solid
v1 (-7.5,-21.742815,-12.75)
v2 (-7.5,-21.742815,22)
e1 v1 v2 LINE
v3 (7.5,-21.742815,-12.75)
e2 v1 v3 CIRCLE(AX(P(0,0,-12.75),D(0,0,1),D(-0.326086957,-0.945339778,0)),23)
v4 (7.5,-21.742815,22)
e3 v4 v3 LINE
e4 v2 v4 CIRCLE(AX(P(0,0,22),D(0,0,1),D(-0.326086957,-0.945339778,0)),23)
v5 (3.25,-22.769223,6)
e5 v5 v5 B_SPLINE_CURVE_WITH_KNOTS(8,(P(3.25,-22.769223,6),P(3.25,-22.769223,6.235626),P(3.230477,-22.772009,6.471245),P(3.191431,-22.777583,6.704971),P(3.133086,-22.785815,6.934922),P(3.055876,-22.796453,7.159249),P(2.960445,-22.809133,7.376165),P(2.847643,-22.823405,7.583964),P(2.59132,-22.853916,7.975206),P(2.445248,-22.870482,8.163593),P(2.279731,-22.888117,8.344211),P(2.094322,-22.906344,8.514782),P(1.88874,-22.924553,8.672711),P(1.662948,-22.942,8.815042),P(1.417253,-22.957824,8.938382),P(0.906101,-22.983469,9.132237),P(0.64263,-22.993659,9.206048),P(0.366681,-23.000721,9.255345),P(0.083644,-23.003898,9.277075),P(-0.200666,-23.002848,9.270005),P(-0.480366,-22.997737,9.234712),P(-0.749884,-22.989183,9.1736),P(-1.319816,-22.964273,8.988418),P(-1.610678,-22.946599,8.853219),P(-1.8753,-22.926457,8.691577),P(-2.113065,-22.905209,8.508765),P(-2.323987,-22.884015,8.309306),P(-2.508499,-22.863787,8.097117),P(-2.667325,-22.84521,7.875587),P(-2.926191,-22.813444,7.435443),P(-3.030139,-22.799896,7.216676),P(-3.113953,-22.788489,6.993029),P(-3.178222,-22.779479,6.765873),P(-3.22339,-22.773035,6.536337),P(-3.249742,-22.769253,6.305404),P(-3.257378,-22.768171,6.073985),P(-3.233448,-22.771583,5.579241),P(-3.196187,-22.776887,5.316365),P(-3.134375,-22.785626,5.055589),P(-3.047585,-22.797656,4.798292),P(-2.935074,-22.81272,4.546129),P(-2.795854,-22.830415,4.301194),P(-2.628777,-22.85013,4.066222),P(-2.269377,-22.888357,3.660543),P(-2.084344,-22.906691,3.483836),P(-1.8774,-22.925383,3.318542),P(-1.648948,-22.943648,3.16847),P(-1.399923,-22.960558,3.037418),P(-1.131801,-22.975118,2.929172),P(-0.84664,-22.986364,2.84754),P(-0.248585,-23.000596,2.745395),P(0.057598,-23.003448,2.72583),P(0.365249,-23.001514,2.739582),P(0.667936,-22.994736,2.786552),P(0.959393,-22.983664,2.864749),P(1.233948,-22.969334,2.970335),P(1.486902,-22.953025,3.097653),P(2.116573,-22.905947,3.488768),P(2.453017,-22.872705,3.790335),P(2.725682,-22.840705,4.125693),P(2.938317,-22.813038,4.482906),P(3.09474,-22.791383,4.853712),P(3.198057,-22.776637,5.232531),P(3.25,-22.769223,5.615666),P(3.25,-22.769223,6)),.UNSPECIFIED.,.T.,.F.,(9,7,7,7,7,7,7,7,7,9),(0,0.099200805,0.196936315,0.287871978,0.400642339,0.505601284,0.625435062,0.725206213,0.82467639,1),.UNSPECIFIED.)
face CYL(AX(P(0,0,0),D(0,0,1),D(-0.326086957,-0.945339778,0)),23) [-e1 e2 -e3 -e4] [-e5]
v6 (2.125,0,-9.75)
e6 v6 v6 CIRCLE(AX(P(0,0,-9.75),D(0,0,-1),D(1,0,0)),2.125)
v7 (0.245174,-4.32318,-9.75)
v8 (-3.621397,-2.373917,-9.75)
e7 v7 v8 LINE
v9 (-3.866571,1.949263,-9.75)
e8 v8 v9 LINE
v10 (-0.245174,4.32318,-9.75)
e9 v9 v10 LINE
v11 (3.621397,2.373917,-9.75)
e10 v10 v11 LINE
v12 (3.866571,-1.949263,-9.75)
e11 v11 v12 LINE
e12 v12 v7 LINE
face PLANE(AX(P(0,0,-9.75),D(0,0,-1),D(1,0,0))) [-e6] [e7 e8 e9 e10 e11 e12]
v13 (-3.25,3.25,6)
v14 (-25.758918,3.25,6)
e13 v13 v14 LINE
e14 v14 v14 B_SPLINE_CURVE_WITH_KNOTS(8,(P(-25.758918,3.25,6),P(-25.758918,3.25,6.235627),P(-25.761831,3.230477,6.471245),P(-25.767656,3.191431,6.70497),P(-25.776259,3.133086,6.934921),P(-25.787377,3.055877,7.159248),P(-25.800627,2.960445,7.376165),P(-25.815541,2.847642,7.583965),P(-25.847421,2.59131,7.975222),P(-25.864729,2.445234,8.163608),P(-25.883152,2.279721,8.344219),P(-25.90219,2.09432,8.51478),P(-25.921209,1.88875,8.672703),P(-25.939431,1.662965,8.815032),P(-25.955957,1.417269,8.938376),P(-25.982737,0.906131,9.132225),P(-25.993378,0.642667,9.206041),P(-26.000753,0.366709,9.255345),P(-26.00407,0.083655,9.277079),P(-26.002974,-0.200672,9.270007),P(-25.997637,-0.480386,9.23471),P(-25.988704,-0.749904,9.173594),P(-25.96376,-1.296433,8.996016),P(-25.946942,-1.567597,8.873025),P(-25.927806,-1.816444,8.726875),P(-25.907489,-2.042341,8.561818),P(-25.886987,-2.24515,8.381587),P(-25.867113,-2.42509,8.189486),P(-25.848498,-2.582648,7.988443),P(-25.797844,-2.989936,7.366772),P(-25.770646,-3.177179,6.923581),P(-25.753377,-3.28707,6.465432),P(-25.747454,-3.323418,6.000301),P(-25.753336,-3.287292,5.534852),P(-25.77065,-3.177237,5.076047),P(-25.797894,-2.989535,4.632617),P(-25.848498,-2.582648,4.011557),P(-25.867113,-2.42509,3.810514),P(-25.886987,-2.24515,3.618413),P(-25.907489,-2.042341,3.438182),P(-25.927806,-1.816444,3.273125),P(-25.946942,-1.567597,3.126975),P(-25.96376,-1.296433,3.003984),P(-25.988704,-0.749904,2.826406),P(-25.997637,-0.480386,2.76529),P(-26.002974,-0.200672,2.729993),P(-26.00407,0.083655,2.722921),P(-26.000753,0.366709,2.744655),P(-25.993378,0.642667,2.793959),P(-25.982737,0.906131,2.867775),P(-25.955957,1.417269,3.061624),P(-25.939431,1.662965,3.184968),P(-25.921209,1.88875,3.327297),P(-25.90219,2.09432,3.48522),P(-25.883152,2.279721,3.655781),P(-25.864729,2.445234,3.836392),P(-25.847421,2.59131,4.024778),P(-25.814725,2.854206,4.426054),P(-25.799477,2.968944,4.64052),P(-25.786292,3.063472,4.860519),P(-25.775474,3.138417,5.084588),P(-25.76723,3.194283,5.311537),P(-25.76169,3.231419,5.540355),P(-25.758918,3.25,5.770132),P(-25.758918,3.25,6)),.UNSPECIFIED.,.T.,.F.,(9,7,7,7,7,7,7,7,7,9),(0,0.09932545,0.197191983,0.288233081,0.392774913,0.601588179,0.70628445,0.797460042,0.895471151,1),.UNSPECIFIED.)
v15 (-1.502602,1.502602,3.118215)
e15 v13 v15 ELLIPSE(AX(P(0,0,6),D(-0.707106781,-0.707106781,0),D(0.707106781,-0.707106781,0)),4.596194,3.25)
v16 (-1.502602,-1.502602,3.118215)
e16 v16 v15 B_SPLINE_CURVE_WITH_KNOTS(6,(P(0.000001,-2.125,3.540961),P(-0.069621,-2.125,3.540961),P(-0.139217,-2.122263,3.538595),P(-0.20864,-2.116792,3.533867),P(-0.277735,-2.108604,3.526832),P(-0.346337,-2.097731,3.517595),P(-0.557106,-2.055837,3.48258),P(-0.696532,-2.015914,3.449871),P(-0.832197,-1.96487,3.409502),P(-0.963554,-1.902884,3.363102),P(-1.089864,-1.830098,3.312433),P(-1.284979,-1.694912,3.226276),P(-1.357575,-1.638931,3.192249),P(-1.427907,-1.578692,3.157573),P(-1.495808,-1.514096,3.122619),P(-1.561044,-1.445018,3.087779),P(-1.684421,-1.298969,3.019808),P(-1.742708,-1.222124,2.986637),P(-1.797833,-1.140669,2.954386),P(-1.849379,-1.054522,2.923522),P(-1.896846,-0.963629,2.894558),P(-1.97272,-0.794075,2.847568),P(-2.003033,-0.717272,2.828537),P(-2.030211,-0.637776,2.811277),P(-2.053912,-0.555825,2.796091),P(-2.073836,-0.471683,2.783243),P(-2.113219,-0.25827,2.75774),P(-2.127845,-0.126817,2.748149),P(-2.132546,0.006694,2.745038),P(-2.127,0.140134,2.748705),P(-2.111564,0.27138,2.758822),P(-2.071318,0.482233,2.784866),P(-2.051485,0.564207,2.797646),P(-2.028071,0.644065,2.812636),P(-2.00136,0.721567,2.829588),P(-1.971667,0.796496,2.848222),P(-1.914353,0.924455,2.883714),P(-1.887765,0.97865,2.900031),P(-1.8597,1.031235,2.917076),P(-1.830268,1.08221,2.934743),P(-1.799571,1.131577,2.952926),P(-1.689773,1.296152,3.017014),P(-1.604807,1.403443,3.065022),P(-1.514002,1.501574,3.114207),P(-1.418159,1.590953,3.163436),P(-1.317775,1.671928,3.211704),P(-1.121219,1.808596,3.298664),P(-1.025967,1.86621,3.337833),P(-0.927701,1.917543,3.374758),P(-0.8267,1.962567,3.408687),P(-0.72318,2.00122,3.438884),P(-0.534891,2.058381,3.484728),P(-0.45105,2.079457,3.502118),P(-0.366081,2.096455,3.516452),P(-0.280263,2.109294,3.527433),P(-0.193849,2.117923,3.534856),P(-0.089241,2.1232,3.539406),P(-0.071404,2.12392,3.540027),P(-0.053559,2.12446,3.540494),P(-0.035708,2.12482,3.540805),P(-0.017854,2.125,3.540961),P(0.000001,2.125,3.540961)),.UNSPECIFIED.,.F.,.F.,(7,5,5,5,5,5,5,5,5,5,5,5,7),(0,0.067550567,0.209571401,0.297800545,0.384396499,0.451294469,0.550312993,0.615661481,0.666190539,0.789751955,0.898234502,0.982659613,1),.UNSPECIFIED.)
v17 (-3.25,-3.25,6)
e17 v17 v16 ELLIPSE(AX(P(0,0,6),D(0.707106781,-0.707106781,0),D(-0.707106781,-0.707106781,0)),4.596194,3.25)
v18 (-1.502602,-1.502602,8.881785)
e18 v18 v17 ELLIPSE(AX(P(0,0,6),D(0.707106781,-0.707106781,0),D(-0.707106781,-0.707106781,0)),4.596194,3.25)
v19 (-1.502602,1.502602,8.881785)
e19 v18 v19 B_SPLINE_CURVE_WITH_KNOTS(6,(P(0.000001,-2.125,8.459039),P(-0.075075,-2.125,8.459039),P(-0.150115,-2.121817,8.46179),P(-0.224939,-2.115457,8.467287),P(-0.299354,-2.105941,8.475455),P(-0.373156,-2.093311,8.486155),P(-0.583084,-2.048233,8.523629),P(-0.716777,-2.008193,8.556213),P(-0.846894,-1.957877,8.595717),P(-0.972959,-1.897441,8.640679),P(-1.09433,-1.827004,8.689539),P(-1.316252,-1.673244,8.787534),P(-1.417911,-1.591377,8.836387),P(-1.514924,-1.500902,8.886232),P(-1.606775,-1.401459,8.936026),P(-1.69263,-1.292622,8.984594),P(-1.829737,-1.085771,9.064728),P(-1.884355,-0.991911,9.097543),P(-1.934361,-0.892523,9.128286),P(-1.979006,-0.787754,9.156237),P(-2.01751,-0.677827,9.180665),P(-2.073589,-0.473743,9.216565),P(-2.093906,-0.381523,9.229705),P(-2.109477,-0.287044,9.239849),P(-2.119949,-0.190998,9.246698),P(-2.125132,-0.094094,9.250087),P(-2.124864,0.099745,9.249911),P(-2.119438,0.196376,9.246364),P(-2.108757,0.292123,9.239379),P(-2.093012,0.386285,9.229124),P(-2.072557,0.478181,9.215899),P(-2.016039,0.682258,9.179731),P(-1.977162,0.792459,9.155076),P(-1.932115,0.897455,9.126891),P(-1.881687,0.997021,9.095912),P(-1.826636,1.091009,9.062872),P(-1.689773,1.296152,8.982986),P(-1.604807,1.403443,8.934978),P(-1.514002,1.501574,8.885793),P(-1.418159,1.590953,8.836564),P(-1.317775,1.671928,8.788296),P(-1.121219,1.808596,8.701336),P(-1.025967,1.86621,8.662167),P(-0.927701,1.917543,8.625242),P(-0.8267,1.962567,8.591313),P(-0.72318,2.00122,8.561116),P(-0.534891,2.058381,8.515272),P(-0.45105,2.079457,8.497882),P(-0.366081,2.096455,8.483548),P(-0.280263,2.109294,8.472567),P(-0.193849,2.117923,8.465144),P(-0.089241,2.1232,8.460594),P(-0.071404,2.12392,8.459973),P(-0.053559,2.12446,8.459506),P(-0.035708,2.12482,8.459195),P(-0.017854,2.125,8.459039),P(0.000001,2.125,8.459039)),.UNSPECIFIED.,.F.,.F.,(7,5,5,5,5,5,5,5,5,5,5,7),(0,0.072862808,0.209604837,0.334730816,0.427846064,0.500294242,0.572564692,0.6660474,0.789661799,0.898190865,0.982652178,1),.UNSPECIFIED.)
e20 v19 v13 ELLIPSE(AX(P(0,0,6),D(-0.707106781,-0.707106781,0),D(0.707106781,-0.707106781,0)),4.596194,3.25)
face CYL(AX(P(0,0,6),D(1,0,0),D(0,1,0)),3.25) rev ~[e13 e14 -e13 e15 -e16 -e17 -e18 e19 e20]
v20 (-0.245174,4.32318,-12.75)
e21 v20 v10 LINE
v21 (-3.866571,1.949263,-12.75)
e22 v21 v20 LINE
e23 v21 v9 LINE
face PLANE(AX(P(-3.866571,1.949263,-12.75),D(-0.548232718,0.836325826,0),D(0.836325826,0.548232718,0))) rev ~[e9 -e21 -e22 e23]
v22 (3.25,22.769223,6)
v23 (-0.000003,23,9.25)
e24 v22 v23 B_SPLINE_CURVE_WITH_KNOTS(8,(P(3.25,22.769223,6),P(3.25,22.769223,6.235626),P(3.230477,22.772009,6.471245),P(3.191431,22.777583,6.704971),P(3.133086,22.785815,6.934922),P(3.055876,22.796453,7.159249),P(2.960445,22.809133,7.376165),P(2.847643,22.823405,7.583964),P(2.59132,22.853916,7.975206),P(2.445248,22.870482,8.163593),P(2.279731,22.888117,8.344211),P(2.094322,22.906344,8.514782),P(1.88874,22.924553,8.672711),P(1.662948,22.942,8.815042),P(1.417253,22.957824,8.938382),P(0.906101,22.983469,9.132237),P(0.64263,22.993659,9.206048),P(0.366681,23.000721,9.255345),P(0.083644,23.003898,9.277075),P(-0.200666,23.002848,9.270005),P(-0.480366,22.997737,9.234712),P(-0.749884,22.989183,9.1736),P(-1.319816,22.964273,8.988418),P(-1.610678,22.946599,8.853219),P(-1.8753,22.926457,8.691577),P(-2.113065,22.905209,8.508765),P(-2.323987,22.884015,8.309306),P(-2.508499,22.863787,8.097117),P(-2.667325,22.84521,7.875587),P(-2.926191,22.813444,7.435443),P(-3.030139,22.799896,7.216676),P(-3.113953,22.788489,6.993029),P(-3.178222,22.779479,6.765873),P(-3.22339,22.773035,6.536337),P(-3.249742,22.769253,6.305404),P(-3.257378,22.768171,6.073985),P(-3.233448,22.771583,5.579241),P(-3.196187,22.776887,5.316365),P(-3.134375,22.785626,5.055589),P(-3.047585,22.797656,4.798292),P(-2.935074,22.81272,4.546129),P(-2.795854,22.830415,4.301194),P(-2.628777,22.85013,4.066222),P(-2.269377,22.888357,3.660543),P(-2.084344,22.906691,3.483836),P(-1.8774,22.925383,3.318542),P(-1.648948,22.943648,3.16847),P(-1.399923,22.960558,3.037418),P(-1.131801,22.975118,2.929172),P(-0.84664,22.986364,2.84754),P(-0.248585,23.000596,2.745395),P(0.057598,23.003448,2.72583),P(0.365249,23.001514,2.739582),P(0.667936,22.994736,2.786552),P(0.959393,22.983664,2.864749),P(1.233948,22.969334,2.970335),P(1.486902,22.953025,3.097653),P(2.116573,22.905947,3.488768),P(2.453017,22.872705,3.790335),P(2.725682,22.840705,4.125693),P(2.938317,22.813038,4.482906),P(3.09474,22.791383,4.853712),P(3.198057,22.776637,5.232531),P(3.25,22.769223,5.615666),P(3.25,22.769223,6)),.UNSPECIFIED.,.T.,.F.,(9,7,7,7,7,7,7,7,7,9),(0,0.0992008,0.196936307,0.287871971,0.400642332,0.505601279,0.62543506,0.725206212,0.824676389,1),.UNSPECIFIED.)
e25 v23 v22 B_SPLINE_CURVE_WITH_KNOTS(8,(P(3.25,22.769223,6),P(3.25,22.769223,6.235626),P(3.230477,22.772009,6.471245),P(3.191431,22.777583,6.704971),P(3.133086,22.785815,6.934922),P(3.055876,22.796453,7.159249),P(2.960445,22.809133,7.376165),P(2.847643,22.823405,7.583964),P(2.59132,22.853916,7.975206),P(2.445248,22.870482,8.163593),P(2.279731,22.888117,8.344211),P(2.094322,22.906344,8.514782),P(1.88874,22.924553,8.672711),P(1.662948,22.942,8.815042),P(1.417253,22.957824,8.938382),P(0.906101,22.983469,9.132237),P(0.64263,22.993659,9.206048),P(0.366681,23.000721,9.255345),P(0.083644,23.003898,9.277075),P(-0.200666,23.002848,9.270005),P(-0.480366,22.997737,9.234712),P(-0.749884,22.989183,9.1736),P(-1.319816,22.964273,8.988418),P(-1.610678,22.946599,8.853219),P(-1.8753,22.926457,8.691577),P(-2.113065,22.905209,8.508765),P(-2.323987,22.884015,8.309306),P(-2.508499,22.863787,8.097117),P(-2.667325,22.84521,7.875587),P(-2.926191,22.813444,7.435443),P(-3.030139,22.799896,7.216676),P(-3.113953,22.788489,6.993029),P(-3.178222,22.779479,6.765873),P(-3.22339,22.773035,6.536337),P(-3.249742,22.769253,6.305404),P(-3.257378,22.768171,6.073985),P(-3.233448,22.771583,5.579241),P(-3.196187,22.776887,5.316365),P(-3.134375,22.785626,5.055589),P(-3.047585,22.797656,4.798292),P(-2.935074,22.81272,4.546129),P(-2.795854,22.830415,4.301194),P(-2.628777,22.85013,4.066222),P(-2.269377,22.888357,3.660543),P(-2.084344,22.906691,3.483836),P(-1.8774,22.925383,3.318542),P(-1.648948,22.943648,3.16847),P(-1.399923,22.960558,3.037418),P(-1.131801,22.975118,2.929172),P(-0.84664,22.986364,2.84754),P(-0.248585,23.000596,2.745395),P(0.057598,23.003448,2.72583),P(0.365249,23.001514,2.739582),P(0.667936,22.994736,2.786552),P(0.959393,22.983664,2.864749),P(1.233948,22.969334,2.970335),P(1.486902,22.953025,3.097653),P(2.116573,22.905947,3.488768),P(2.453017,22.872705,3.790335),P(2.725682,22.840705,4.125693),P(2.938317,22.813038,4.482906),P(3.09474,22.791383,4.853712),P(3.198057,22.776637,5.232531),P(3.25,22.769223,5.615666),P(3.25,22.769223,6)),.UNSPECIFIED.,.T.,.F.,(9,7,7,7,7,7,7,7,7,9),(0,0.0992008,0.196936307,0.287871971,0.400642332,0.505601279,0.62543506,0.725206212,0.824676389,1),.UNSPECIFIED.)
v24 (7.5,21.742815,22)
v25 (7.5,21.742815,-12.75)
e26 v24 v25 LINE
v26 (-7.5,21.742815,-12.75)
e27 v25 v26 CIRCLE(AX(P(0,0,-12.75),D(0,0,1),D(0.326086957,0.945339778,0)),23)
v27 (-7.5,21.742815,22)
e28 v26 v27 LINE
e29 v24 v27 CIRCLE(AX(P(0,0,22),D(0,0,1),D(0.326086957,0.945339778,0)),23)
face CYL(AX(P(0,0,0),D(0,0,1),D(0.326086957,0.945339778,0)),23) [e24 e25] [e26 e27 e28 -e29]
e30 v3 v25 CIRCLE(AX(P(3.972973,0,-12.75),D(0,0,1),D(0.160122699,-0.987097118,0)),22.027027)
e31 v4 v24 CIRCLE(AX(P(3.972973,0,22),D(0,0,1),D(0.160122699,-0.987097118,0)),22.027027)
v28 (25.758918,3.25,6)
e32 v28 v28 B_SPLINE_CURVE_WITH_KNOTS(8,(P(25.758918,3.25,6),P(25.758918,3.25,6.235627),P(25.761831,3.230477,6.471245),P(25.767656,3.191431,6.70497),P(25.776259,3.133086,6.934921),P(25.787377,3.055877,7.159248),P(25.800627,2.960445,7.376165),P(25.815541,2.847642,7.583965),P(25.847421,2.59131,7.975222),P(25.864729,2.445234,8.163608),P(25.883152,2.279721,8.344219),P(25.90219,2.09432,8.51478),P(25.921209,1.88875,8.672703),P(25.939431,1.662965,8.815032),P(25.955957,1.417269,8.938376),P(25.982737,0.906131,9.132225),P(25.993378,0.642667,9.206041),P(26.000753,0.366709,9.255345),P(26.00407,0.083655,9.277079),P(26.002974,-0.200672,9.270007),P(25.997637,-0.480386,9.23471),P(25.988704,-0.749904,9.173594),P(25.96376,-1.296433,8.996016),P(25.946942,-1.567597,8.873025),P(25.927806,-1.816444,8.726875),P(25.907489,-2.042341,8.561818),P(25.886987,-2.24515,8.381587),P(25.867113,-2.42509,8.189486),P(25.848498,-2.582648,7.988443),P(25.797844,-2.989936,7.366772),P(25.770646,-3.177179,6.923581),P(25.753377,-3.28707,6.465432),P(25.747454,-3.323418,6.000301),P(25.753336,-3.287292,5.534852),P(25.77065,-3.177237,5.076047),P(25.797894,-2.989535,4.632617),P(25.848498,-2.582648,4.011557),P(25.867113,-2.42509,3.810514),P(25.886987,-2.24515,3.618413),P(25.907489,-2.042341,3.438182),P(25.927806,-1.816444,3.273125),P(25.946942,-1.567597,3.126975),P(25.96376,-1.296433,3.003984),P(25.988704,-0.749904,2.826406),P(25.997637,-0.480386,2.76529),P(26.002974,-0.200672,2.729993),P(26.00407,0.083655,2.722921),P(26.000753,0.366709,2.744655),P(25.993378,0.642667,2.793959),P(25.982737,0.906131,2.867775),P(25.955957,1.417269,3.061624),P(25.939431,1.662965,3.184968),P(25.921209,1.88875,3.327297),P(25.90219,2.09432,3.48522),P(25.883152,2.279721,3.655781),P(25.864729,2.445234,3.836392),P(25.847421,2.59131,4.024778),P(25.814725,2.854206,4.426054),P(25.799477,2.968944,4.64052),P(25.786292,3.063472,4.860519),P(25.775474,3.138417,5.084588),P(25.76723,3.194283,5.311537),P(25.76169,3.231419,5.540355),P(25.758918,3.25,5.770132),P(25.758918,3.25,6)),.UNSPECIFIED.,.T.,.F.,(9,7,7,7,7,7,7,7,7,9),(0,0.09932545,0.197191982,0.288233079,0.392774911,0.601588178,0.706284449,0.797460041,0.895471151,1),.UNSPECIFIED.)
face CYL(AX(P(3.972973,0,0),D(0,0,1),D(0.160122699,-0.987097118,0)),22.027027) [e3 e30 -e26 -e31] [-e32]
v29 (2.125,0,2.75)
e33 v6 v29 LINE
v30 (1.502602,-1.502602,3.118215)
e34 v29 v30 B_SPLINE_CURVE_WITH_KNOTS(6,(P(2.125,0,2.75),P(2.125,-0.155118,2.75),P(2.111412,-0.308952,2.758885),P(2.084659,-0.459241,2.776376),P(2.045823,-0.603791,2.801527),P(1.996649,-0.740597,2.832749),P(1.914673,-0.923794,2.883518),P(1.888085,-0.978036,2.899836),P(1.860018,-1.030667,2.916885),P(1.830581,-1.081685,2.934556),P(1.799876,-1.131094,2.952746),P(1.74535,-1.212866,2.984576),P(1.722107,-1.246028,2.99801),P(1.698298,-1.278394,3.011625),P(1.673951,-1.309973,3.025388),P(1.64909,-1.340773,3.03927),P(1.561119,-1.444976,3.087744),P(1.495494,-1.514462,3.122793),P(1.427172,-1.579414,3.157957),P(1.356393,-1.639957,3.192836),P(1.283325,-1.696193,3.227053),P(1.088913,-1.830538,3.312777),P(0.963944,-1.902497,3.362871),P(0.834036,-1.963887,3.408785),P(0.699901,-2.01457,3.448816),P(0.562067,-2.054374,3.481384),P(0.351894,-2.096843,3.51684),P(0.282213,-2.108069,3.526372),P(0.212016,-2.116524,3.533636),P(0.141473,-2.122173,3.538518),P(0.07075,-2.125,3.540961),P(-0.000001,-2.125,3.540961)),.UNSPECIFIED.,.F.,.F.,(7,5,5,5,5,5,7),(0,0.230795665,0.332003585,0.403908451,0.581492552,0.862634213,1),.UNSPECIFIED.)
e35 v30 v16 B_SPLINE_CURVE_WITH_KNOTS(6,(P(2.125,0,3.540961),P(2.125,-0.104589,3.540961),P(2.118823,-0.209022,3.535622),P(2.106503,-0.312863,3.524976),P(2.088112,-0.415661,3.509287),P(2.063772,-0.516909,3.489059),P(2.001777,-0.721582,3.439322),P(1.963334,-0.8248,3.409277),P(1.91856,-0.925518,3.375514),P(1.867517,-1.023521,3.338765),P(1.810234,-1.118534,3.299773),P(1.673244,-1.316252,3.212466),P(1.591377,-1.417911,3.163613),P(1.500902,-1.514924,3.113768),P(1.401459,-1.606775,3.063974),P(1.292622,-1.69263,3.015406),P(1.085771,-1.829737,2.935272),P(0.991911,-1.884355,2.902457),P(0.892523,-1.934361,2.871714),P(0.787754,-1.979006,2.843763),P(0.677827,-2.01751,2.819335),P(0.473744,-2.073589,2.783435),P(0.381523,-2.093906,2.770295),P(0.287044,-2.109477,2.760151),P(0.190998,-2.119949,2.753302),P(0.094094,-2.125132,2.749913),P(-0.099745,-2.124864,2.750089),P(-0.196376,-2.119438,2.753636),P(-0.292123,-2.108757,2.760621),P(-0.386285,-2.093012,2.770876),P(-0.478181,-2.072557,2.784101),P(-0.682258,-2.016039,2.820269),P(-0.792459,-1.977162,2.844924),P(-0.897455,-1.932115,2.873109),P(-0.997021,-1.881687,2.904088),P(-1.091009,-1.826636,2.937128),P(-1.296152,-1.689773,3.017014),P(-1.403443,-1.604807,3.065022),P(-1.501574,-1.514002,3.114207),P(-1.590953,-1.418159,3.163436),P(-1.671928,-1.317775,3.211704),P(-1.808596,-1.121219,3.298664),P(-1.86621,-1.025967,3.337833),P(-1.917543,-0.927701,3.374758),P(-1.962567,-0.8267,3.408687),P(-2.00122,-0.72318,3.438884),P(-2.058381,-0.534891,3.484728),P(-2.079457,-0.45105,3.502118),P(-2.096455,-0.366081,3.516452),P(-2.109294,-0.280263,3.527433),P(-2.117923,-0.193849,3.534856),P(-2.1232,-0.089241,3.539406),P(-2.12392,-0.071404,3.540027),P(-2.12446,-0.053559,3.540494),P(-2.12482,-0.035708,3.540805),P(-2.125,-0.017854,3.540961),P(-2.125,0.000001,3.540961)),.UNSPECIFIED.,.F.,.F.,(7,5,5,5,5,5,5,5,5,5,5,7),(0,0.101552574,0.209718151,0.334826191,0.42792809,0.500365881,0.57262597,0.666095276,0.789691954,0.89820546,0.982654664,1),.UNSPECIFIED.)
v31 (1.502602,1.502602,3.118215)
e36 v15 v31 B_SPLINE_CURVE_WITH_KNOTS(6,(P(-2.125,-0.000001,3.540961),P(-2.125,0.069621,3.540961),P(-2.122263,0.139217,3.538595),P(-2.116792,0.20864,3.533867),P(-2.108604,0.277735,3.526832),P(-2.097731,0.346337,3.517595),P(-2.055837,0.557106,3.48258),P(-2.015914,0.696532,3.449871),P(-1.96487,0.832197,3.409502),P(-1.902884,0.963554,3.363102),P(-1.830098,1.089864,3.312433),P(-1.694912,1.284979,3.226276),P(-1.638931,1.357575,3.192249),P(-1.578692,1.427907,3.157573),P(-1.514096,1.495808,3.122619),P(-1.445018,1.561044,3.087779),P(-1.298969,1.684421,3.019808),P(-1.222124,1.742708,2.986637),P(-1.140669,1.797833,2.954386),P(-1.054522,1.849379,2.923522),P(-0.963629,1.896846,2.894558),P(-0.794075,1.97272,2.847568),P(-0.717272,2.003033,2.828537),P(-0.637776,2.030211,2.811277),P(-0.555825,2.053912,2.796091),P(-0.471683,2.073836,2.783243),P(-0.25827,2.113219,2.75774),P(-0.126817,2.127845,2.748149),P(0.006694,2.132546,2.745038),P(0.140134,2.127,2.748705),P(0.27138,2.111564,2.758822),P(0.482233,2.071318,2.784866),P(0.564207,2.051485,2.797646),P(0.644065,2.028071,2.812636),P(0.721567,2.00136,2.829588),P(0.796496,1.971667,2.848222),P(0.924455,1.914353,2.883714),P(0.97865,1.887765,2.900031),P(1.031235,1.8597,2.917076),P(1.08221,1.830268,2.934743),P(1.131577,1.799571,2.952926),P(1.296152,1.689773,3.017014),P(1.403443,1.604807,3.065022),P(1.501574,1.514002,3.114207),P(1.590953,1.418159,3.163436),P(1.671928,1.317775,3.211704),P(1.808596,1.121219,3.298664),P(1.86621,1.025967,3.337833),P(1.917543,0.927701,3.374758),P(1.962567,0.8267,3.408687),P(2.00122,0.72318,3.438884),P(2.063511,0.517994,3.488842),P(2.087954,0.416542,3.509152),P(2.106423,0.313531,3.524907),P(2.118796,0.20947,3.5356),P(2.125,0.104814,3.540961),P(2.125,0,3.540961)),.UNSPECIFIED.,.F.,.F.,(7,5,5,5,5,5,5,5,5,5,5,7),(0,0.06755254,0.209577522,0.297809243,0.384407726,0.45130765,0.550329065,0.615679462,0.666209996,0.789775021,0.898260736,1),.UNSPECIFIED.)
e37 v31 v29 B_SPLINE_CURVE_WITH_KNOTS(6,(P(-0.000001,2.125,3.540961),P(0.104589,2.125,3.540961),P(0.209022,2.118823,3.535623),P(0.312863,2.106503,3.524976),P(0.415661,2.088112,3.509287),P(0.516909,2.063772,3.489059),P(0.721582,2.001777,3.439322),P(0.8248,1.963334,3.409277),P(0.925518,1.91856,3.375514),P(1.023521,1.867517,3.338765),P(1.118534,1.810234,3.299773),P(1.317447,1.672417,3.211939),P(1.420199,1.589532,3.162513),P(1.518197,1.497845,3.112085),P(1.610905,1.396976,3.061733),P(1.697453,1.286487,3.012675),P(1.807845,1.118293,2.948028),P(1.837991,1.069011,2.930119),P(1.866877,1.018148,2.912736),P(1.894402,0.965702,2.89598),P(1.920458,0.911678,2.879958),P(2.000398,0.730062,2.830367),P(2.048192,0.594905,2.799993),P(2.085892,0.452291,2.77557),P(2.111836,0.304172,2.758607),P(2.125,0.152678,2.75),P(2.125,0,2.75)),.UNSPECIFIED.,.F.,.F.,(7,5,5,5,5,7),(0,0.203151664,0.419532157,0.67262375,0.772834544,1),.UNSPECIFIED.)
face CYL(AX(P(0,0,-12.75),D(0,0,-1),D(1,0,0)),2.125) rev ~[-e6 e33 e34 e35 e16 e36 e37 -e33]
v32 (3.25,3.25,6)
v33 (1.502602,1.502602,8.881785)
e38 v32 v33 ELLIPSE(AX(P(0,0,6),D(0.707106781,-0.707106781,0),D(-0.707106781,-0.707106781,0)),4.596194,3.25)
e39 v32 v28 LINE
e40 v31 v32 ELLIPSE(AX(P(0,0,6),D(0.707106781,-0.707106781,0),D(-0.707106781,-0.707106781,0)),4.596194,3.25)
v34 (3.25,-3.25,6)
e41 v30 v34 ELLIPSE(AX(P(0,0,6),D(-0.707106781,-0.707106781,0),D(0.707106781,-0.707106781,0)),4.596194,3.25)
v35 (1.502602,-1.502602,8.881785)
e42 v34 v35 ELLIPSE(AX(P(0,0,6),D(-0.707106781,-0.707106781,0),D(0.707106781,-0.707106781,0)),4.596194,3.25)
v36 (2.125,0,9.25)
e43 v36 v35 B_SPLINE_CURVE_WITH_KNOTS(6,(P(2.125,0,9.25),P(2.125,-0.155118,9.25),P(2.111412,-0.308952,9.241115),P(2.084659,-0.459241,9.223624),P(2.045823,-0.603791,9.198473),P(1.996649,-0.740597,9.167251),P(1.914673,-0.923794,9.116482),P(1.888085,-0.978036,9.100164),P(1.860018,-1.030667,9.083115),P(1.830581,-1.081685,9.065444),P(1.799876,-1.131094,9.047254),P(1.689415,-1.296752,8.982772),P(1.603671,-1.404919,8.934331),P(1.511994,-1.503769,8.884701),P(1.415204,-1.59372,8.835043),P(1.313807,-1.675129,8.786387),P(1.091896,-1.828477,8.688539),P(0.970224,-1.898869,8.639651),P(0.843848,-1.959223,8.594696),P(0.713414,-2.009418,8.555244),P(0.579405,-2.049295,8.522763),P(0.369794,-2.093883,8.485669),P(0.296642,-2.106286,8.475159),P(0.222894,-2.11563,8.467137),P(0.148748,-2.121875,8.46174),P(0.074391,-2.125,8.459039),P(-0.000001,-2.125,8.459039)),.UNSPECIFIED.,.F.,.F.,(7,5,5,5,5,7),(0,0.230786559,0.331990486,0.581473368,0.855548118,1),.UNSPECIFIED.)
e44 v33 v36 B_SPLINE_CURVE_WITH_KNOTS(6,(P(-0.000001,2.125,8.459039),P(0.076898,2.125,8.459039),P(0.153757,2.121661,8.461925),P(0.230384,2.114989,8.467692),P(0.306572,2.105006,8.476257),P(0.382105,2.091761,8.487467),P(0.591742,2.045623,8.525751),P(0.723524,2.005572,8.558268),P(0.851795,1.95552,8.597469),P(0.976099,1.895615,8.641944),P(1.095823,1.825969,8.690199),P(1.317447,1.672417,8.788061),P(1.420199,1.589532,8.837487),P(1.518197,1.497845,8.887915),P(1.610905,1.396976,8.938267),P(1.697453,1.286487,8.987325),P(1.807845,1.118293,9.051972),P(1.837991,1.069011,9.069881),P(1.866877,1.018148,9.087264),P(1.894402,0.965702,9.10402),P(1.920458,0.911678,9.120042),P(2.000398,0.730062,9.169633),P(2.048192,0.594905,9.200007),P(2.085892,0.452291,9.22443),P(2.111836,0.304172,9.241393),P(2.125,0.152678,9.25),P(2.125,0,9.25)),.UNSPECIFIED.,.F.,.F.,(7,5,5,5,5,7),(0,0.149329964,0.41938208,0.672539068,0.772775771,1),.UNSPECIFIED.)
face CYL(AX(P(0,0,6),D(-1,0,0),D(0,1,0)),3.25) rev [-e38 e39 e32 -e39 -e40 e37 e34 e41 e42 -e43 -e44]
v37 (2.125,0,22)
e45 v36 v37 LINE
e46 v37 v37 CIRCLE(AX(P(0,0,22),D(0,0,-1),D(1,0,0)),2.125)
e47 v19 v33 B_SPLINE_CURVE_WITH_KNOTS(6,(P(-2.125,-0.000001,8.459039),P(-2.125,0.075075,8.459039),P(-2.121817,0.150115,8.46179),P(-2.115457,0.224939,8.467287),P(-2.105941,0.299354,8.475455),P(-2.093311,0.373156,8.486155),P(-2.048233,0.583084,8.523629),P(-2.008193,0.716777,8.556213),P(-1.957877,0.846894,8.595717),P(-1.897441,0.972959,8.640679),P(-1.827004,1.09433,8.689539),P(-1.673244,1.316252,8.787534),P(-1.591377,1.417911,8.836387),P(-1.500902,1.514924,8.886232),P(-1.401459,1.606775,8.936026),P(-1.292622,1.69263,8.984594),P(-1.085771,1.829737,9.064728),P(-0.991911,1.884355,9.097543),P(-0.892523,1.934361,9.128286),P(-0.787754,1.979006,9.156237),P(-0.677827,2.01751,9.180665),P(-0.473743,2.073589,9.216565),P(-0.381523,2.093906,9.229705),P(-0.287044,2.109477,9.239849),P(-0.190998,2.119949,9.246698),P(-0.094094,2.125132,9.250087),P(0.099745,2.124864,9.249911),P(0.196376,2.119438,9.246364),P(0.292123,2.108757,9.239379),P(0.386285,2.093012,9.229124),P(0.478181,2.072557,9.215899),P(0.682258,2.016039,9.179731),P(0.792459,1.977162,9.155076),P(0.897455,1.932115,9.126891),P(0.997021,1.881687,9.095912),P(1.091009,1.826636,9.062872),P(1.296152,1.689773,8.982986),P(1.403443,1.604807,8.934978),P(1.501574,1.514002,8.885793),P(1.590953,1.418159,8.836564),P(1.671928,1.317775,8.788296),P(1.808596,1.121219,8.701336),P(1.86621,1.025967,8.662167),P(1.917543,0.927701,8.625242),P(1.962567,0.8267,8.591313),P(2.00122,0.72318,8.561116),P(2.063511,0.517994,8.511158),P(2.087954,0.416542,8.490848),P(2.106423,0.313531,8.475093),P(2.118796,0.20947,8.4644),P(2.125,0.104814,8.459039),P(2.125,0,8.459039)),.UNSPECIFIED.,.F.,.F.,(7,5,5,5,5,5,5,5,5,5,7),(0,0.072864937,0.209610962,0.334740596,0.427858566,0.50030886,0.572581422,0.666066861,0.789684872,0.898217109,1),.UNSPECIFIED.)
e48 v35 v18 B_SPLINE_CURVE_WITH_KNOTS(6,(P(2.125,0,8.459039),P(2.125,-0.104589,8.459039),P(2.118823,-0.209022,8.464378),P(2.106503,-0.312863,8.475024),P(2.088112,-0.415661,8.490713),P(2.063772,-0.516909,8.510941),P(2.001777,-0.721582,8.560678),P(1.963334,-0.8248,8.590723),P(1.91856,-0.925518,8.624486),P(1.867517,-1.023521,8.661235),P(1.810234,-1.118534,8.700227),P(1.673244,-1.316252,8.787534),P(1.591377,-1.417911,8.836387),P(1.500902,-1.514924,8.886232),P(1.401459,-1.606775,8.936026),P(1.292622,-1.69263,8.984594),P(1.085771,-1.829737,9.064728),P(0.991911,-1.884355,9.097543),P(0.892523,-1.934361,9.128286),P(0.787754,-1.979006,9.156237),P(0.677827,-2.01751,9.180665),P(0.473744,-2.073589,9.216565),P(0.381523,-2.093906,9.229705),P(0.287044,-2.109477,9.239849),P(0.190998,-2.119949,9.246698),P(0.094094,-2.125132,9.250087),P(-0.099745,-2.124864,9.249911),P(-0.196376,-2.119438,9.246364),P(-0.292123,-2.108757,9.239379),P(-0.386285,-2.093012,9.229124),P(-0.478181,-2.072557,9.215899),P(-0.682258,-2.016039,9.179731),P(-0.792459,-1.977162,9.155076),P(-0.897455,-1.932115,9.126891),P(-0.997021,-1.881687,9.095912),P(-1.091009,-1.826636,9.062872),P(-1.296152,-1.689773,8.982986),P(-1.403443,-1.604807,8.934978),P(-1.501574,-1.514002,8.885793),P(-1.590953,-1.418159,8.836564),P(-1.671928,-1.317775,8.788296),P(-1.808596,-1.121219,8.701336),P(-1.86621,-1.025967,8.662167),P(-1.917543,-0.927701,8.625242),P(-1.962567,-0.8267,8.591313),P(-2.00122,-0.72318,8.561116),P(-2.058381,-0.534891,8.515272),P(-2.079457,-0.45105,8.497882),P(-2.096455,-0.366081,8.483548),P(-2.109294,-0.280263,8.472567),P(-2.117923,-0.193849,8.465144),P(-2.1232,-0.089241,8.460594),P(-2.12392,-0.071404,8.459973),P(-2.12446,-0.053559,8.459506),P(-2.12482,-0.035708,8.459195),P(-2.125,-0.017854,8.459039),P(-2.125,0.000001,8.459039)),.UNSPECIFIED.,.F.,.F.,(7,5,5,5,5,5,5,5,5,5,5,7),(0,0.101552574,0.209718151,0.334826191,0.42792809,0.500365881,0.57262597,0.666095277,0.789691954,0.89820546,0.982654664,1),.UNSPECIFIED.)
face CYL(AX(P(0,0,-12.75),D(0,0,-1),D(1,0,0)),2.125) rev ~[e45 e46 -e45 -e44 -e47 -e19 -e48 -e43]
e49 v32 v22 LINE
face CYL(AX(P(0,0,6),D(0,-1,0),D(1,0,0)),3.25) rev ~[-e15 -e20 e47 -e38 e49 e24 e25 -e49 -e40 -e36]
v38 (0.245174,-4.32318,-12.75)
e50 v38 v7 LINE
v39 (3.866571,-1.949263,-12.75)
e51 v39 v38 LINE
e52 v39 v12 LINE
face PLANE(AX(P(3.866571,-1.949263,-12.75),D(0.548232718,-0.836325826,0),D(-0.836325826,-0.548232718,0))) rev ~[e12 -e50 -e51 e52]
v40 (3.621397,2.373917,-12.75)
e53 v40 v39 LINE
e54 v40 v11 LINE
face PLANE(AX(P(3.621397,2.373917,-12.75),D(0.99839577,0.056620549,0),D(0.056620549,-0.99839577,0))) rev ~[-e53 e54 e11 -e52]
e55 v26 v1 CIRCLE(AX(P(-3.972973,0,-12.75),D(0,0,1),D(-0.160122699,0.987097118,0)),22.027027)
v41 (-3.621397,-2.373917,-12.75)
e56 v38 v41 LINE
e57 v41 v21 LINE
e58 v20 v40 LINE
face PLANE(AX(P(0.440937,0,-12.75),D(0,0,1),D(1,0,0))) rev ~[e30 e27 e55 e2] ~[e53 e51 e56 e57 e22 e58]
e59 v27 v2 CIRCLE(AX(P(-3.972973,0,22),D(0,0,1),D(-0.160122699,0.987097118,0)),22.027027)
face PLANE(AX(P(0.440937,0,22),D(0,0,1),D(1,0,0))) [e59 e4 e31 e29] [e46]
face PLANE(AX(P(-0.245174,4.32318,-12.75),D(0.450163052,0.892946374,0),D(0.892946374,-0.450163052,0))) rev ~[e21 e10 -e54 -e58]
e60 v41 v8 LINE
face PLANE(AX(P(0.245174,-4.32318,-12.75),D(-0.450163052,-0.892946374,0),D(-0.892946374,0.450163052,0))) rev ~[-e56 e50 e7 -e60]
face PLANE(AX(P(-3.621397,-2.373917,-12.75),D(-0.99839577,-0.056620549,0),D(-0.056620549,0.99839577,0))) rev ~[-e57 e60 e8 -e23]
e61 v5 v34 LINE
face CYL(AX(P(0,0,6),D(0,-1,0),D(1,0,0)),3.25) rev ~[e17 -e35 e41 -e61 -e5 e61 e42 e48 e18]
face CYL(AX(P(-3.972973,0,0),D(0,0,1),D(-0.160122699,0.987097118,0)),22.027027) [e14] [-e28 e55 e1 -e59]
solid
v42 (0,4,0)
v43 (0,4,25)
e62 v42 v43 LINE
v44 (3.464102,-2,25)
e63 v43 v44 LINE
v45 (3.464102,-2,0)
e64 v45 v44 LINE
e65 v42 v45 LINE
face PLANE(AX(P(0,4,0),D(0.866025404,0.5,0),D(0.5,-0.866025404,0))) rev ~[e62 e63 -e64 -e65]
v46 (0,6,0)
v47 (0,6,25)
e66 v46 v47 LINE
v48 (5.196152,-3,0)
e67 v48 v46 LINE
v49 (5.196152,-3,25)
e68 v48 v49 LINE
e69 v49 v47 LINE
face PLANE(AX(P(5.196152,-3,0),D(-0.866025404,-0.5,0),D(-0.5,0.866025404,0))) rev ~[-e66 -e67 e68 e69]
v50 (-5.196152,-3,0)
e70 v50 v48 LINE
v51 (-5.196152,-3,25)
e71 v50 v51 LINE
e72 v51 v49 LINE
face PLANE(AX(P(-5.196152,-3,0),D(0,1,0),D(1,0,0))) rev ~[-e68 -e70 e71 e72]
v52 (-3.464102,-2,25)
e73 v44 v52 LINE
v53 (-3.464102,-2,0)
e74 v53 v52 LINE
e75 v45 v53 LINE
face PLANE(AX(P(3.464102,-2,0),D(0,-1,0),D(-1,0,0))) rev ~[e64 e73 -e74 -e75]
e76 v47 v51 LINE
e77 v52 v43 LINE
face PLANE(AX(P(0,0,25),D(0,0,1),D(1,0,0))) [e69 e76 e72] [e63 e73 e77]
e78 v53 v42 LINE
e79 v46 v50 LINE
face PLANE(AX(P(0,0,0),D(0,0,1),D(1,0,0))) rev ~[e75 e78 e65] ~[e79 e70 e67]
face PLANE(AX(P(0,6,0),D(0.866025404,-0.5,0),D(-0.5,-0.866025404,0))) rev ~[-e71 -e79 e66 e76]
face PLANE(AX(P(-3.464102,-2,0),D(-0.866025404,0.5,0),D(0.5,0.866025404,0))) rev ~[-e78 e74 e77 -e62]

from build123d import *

# Parameters (mm, degrees)
F1_DEPTH       = 12
F3_R           = 3.25
F4_DEPTH       = 25
F4_DEPTH_BACK  = 25
F6_DEPTH       = 25
F12_DEPTH      = 22
F12_DEPTH_BACK = 12.75
F13_DEPTH      = 25
F13_DEPTH_BACK = 25
F14_R          = 3.25
F15_DEPTH      = 30
F15_DEPTH_BACK = 30
F16_R          = 2.125
F17_DEPTH      = 50
F18_DEPTH      = 3


# Not quite as in the source:
# - a feature of the source that left no trace in its solid (it failed there, or was rolled back) is left out
# - a feature names something its author has since deleted; it is built from what else it names


with BuildPart() as f1:
    # F0 (on Top) → F1 (new body)
    with BuildSketch(Plane.XY):
        with BuildLine():
            ThreePointArc((-11.87, 16.0966797819), (0, 20), (11.87, 16.0966797819))
            ThreePointArc((11.87, 16.0966797819), (0, 23), (-11.87, 16.0966797819))
        make_face()
        with BuildLine():
            ThreePointArc((-19.8751336077, 2.231381652), (-19.918584287, -11.5), (-8.0051336077, -18.3280614339))
            ThreePointArc((-8.0051336077, -18.3280614339), (-17.3205080757, -10), (-19.8751336077, 2.231381652))
        make_face()
        with BuildLine():
            ThreePointArc((19.8751336077, 2.231381652), (19.9687590019, 1.1174363173), (20, 0))
            ThreePointArc((20, 0), (16.7347344191, -10.9521077388), (8.0051336077, -18.3280614339))
            ThreePointArc((8.0051336077, -18.3280614339), (19.918584287, -11.5), (19.8751336077, 2.231381652))
        make_face()
        with BuildLine():
            ThreePointArc((8.0051336077, -18.3280614339), (16.7347344191, -10.9521077388), (20, 0))
            ThreePointArc((20, 0), (19.9687590019, 1.1174363173), (19.8751336077, 2.231381652))
            ThreePointArc((19.8751336077, 2.231381652), (17.3205080757, 10), (11.87, 16.0966797819))
            ThreePointArc((11.87, 16.0966797819), (0, 20), (-11.87, 16.0966797819))
            ThreePointArc((-11.87, 16.0966797819), (-17.3205080757, 10), (-19.8751336077, 2.231381652))
            ThreePointArc((-19.8751336077, 2.231381652), (-17.3205080757, -10), (-8.0051336077, -18.3280614339))
            ThreePointArc((-8.0051336077, -18.3280614339), (0, -20), (8.0051336077, -18.3280614339))
        make_face()
    extrude(amount=F1_DEPTH)

    # F3 (on offset) → F4 (cut, two sides)
    with BuildSketch(Plane.XZ) as f4_sk:
        with Locations((0, 6)):
            Circle(F3_R)
    extrude(amount=F4_DEPTH, mode=Mode.SUBTRACT)
    extrude(f4_sk.sketch, amount=-F4_DEPTH_BACK, mode=Mode.SUBTRACT)

    # F11 (on Top) → F12 (join, two sides)
    with BuildSketch(Plane.XY) as f12_sk:
        with BuildLine():
            ThreePointArc((7.5, -21.7428149052), (18.7283208003, -13.3510299228), (23, 0))
            ThreePointArc((23, 0), (18.7283208003, 13.3510299228), (7.5, 21.7428149052))
            ThreePointArc((7.5, 21.7428149052), (0, 23), (-7.5, 21.7428149052))
            ThreePointArc((-7.5, 21.7428149052), (-23, 0), (-7.5, -21.7428149052))
            ThreePointArc((-7.5, -21.7428149052), (0, -23), (7.5, -21.7428149052))
        make_face()
        with BuildLine():
            ThreePointArc((-7.5, -21.7428149052), (-23, 0), (-7.5, 21.7428149052))
            ThreePointArc((-7.5, 21.7428149052), (-26, 0), (-7.5, -21.7428149052))
        make_face()
        with BuildLine():
            ThreePointArc((7.5, 21.7428149052), (18.7283208003, 13.3510299228), (23, 0))
            ThreePointArc((23, 0), (18.7283208003, -13.3510299228), (7.5, -21.7428149052))
            ThreePointArc((7.5, -21.7428149052), (26, 0), (7.5, 21.7428149052))
        make_face()
    extrude(amount=F12_DEPTH)
    extrude(f12_sk.sketch, amount=-F12_DEPTH_BACK)

    # F3 (on offset) → F13 (cut, two sides)
    with BuildSketch(Plane.XZ) as f13_sk:
        with Locations((0, 6)):
            Circle(F3_R)
    extrude(amount=-F13_DEPTH, mode=Mode.SUBTRACT)
    extrude(f13_sk.sketch, amount=F13_DEPTH_BACK, mode=Mode.SUBTRACT)

    # F14 (on Right) → F15 (cut, two sides)
    with BuildSketch(Plane.YZ) as f15_sk:
        with Locations((0, 6)):
            Circle(F14_R)
    extrude(amount=-F15_DEPTH, mode=Mode.SUBTRACT)
    extrude(f15_sk.sketch, amount=F15_DEPTH_BACK, mode=Mode.SUBTRACT)

    # F16 (on face) → F17 (cut)
    with BuildSketch(Plane(origin=(0, 0, -12.75), x_dir=(1, 0, 0), z_dir=(0, 0, -1))):
        Circle(F16_R)
    extrude(amount=-F17_DEPTH, mode=Mode.SUBTRACT)

    # F16 (on face) → F18 (cut)
    with BuildSketch(Plane(origin=(0, 0, -12.75), x_dir=(1, 0, 0), z_dir=(0, 0, -1))):
        Polygon((-0.2451741669, -4.3231804991), (3.6213970539, -2.3739173065), (3.8665712208, 1.9492631926), (0.2451741669, 4.3231804991), (-3.6213970539, 2.3739173065), (-3.8665712208, -1.9492631926), align=None)
        Circle(F16_R, mode=Mode.SUBTRACT)
    extrude(amount=-F18_DEPTH, mode=Mode.SUBTRACT)


with BuildPart() as f6:
    # F5 (on Top) → F6 (new body)
    with BuildSketch(Plane.XY):
        Polygon((-5.1961524227, -3), (5.1961524227, -3), (0, 6), align=None)
        Polygon((0, 4), (3.4641016151, -2), (-3.4641016151, -2), align=None, mode=Mode.SUBTRACT)
    extrude(amount=F6_DEPTH)


solid = Compound([f1.part, f6.part])
